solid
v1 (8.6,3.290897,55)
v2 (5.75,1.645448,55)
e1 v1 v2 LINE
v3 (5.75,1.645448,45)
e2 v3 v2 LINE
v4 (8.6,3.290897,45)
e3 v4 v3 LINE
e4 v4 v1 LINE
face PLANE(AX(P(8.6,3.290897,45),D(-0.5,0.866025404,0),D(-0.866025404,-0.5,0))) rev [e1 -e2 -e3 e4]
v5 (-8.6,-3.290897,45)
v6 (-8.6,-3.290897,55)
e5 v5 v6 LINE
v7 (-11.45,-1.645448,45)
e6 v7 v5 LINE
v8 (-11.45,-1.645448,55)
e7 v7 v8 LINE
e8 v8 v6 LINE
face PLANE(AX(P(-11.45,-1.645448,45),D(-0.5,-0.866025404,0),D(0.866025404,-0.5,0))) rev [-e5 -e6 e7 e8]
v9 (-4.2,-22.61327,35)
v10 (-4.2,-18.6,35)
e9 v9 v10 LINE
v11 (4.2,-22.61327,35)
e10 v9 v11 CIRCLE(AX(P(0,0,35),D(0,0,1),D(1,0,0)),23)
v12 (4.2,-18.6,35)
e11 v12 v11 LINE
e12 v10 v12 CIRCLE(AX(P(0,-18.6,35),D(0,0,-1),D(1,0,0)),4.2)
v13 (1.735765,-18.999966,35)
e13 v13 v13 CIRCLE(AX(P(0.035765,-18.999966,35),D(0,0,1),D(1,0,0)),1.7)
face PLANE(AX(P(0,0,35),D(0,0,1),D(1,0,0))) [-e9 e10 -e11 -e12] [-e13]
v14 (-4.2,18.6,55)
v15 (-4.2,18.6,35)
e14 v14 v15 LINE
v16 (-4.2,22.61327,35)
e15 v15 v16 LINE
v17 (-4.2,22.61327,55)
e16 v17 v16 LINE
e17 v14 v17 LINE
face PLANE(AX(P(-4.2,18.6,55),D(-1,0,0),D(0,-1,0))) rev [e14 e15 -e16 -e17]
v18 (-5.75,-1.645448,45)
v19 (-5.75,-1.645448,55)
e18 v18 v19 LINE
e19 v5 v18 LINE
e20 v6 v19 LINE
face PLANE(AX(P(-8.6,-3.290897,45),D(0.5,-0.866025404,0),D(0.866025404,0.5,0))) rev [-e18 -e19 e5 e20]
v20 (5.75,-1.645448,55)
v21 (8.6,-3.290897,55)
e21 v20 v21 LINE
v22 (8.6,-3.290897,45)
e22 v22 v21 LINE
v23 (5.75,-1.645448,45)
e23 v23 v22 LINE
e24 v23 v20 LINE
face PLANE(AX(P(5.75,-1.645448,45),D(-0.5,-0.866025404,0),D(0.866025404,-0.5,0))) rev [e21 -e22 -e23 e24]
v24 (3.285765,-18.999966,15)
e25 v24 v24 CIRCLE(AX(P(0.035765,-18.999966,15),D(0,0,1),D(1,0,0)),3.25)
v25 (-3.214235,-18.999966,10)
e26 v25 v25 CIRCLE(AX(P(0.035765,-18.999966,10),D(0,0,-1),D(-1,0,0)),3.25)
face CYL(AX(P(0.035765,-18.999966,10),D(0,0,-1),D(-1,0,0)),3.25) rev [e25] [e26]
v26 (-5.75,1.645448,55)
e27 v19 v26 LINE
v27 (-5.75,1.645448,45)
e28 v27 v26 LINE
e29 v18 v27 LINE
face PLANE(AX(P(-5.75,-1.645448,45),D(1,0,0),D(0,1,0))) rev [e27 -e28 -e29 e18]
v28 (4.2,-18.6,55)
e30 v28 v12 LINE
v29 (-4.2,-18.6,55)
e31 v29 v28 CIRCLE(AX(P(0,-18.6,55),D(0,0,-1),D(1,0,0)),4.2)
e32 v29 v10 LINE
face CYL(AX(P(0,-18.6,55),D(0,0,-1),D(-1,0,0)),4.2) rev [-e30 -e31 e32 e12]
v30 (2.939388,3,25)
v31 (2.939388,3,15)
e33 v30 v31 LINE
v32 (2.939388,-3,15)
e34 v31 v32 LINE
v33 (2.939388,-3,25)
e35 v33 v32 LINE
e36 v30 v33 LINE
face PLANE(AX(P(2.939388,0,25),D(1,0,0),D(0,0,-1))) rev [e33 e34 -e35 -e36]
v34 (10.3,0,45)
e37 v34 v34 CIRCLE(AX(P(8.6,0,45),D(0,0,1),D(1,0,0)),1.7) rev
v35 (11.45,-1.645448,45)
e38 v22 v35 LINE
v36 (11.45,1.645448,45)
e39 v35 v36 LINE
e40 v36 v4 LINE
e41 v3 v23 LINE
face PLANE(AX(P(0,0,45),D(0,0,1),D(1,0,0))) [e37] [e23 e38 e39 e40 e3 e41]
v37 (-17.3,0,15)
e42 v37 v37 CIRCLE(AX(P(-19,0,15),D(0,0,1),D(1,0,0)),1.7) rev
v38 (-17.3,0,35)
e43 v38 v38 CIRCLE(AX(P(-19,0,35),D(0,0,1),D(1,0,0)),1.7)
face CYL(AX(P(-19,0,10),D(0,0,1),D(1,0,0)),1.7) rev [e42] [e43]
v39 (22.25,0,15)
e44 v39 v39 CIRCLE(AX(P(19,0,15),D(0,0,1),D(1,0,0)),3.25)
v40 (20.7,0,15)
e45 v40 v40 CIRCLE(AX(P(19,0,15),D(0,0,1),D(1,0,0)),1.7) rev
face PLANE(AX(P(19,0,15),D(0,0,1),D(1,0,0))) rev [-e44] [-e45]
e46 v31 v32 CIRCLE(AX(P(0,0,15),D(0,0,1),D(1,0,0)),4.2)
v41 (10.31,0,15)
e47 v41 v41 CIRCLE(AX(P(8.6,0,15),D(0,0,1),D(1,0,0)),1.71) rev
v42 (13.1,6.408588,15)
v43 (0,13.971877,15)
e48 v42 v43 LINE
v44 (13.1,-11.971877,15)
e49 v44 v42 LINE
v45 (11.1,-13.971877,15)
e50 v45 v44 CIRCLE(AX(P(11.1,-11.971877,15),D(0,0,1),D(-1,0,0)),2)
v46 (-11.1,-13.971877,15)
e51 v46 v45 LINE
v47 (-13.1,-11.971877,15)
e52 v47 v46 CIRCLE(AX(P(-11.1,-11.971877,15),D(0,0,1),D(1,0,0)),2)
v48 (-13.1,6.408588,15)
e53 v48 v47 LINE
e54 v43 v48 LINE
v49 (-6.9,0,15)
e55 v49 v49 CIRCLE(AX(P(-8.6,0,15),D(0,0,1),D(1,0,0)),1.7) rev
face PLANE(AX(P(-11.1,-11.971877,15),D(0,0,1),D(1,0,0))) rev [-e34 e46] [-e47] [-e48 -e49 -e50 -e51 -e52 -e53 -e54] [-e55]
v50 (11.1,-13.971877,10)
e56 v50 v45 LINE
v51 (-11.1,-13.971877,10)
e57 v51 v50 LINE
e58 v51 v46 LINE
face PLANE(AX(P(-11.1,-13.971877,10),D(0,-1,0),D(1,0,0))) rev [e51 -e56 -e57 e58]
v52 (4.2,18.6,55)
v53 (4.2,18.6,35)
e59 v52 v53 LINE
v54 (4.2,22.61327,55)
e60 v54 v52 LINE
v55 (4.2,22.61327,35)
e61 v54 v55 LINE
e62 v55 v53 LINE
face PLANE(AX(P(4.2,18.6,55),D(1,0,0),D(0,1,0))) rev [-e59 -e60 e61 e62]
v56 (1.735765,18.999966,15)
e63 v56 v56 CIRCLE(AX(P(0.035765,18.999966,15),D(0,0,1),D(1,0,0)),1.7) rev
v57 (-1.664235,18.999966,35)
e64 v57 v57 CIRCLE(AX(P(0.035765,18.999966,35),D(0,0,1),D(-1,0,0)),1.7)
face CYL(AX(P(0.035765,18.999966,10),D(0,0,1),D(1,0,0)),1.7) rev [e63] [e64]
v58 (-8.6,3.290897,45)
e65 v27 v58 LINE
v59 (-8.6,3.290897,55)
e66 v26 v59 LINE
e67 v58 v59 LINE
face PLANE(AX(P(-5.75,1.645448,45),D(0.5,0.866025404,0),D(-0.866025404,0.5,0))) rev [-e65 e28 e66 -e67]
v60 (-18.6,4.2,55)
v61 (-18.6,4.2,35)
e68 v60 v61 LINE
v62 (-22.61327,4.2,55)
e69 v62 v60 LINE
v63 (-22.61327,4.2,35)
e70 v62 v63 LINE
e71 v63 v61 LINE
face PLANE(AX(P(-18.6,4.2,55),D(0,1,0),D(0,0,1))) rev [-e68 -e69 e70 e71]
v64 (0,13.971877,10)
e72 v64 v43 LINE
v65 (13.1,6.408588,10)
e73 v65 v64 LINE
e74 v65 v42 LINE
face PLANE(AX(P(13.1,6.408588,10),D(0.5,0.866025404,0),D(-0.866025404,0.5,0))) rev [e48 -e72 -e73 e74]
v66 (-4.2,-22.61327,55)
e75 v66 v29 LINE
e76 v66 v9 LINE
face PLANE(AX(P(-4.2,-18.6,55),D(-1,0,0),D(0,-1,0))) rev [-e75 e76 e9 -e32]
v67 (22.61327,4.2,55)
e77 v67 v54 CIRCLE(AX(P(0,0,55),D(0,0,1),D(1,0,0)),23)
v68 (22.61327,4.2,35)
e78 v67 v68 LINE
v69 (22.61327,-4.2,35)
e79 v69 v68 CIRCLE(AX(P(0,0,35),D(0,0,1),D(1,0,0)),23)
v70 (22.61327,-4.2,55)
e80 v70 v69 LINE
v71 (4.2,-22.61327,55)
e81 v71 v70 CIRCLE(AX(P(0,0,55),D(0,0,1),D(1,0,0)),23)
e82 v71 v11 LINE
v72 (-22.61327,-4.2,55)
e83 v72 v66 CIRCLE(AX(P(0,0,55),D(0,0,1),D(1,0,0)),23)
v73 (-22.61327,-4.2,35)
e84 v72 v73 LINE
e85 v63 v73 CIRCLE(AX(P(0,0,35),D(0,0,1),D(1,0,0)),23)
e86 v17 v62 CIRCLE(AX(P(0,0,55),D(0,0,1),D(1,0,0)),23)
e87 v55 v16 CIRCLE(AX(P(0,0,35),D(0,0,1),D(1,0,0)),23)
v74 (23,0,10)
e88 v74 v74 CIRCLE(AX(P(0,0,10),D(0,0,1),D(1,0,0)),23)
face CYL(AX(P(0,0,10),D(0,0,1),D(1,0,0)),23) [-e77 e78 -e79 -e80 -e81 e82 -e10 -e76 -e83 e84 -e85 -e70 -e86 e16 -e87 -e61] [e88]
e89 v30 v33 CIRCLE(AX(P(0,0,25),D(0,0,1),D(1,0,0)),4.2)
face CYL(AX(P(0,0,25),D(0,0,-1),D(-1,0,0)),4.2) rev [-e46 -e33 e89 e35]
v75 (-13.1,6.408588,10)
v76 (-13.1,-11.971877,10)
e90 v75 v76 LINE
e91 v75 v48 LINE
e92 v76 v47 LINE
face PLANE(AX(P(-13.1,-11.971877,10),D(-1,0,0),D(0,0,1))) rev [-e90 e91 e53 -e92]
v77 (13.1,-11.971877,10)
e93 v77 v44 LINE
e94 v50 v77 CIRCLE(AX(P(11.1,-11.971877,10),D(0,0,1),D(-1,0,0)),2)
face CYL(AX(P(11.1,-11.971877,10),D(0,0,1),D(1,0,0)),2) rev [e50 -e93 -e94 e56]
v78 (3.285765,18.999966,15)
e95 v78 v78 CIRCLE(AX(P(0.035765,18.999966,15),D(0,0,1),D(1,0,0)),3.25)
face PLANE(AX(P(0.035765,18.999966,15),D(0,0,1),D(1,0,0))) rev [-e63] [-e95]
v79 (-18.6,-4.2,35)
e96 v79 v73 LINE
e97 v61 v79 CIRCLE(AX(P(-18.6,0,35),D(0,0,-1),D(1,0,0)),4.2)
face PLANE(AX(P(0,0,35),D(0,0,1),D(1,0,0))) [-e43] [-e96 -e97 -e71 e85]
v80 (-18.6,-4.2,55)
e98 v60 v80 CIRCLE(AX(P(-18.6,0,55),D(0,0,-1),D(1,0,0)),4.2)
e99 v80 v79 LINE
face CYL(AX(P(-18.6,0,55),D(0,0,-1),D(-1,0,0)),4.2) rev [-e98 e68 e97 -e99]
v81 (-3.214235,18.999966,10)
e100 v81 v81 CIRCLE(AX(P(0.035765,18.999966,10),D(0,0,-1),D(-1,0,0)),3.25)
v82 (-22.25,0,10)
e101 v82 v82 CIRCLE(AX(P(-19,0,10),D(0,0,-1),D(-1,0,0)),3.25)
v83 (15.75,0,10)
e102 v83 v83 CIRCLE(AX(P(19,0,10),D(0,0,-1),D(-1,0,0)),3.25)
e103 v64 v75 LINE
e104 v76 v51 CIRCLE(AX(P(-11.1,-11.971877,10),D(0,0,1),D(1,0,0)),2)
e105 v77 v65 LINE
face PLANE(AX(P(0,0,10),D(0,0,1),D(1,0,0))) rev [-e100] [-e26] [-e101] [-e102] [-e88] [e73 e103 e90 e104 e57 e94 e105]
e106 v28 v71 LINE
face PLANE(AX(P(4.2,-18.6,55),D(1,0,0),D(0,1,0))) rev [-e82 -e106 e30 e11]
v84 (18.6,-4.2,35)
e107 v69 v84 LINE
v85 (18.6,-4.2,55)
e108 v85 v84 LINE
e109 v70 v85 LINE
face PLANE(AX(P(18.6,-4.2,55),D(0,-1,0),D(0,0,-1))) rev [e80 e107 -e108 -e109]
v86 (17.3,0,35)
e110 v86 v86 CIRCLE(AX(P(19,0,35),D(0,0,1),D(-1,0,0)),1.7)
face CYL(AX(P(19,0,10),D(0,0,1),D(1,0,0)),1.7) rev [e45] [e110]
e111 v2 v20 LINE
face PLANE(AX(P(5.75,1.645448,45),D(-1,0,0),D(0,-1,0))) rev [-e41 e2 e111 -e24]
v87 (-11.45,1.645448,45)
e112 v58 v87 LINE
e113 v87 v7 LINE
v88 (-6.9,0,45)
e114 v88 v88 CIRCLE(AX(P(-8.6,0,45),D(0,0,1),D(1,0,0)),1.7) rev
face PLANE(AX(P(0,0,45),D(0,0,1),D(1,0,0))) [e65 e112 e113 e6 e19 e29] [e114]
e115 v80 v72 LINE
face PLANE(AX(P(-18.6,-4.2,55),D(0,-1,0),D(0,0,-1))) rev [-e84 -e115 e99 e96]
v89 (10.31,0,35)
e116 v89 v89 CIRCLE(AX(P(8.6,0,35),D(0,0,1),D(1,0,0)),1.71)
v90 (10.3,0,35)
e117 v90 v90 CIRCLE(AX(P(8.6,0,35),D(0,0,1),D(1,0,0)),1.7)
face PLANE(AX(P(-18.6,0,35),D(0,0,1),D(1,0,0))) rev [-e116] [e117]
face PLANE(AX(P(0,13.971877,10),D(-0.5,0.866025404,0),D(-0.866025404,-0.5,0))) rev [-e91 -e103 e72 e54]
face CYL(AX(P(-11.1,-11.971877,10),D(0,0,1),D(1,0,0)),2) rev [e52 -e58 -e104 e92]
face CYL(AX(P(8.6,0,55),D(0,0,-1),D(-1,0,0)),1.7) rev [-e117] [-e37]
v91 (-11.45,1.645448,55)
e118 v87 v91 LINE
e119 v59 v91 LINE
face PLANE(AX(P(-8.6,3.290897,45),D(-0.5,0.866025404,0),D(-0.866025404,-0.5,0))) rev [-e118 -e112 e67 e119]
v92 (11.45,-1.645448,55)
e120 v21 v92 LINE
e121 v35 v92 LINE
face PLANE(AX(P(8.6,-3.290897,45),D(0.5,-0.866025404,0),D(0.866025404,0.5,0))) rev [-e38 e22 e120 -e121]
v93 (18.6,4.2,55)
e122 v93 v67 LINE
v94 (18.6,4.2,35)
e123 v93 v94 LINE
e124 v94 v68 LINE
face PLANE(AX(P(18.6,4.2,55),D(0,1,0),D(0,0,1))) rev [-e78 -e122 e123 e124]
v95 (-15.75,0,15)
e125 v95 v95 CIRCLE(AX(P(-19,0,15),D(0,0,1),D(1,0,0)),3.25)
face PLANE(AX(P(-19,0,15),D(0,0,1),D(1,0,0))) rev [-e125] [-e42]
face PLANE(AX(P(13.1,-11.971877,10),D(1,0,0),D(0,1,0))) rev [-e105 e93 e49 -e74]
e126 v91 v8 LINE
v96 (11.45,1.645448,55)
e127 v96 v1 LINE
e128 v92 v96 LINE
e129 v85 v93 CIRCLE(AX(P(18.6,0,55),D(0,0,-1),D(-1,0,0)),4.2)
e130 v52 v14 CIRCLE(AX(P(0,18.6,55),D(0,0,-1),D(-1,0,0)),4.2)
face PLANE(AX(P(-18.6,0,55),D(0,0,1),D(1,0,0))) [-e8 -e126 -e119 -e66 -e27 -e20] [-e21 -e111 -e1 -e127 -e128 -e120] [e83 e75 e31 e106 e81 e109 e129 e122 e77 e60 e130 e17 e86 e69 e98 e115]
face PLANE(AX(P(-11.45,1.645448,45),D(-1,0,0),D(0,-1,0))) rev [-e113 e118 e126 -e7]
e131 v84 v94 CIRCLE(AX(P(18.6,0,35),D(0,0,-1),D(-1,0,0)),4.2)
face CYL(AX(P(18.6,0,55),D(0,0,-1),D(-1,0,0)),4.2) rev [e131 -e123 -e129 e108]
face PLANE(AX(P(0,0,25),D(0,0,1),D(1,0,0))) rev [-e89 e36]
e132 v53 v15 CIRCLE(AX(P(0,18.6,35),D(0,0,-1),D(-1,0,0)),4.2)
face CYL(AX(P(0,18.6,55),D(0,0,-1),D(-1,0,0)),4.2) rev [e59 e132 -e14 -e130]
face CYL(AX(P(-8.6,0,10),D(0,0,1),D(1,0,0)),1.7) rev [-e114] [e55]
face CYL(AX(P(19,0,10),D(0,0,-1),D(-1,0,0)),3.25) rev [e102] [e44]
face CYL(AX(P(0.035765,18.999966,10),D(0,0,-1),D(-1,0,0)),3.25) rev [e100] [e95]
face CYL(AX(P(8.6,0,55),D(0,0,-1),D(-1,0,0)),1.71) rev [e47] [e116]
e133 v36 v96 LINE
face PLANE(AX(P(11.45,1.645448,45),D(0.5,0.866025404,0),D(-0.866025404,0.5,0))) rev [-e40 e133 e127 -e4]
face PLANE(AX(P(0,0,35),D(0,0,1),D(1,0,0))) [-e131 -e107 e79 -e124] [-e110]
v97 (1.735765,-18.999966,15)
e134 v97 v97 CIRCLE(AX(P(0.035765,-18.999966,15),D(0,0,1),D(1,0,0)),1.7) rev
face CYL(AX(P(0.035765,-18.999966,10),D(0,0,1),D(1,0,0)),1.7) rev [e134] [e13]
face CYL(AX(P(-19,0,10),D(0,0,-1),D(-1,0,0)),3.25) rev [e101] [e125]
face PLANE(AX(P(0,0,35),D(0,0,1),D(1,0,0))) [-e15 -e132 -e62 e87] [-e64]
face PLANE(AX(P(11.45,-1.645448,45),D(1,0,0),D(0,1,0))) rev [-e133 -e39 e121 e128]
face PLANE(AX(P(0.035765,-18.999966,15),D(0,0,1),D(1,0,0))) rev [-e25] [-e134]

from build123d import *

# Parameters (mm, degrees)
BOSS_EXTRUDE1_OUTLINE_R    = 16
BOSS_EXTRUDE1_DEPTH        = 15
SKETCH2_W                  = 7.4
SKETCH2_H                  = 24.742483552
CUT_EXTRUDE1_DEPTH         = 16.8
SKETCH3_R                  = 1.71
CUT_EXTRUDE2_DEPTH         = 70
BOSS_EXTRUDE2_DEPTH        = 20
BOSS_EXTRUDE2_DEPTH_BACK   = 5
SKETCH10_R                 = 23
SKETCH10_R_2               = 1.7
CUT_EXTRUDE4_DEPTH         = 25
SKETCH3_11_R               = 1.71
CUT_EXTRUDE5_DEPTH         = 55
CUT_EXTRUDE6_DEPTH         = 2.3
CUT_EXTRUDE6_DEPTH_BACK    = 0.7
SKETCH14_R                 = 12.3
BOSS_EXTRUDE3_START        = 20
BOSS_EXTRUDE3_DEPTH        = 20
SKETCH19_R                 = 16.2
CUT_EXTRUDE7_DEPTH         = 2.2
CUT_EXTRUDE8_START         = 35
CUT_EXTRUDE8_OUTLINE_R     = 1.7
CUT_EXTRUDE8_DEPTH         = 20
CUT_EXTRUDE9_START         = 2
CUT_EXTRUDE9_OUTLINE_R     = 16
CUT_EXTRUDE9_OUTLINE_R_2   = 15.484452344
CUT_EXTRUDE9_DEPTH         = 8
CUT_EXTRUDE9_START_2       = 10
CUT_EXTRUDE9_2_OUTLINE_R   = 3.25
CUT_EXTRUDE9_2_OUTLINE_R_2 = 1.7
CUT_EXTRUDE9_2_DEPTH       = 3
CUT_EXTRUDE10_DEPTH        = 3.6
SKETCH36_R                 = 15.484452344
CUT_EXTRUDE11_DEPTH        = 8
CUT_EXTRUDE13_DEPTH        = 5
CUT_EXTRUDE14_DEPTH        = 10
SKETCH39_R                 = 3.25
CUT_EXTRUDE15_DEPTH        = 5


# Read off the part's stored shape, not the designer's step: Boss-Extrude1, Cut-Extrude8, Cut-Extrude9
with BuildPart() as part:
    # Boss-Extrude1 outline → Boss-Extrude1 (new body)
    with BuildSketch(Plane(origin=(0, 0, 0), x_dir=(0, 1, 0), z_dir=(0, 0, 1))):
        Circle(BOSS_EXTRUDE1_OUTLINE_R)
    extrude(amount=BOSS_EXTRUDE1_DEPTH)

    # Sketch2 → Cut-Extrude1 (cut)
    with BuildSketch(Plane.ZY.offset(16)):
        with Locations((10.1, 0)):
            Rectangle(SKETCH2_W, SKETCH2_H)
    extrude(amount=-CUT_EXTRUDE1_DEPTH, mode=Mode.SUBTRACT)

    # Sketch3 → Cut-Extrude2 (cut)
    with BuildSketch(Plane(origin=(0, 0, 0), x_dir=(0, 1, 0), z_dir=(0, 0, 1))):
        with Locations((0, 8.6)):
            Circle(SKETCH3_R)
    extrude(amount=CUT_EXTRUDE2_DEPTH, mode=Mode.SUBTRACT)

    # Sketch10 → Boss-Extrude2 (add, two sides: drawn at the far end of the back side and taken through both)
    with BuildSketch(Plane(origin=(0, 0, 15), x_dir=(0, 1, 0), z_dir=(0, 0, 1)).offset(-BOSS_EXTRUDE2_DEPTH_BACK)):
        with Locations(Location((0, 0, 0), (0, 0, 270))):
            Circle(SKETCH10_R)
        with Locations(Location((0, 8.6, 0), (0, 0, 270))):
            Circle(SKETCH10_R_2, mode=Mode.SUBTRACT)
        with Locations(Location((0, 19, 0), (0, 0, 270))):
            Circle(SKETCH10_R_2, mode=Mode.SUBTRACT)
        with Locations(Location((18.999966339, -0.035764812, 0), (0, 0, 90))):
            Circle(SKETCH10_R_2, mode=Mode.SUBTRACT)
        with Locations(Location((0, -19, 0), (0, 0, 90))):
            Circle(SKETCH10_R_2, mode=Mode.SUBTRACT)
        with Locations(Location((-18.999966339, -0.035764812, 0), (0, 0, 270))):
            Circle(SKETCH10_R_2, mode=Mode.SUBTRACT)
        with Locations(Location((0, -8.6, 0), (0, 0, 270))):
            Circle(SKETCH10_R_2, mode=Mode.SUBTRACT)
    extrude(amount=BOSS_EXTRUDE2_DEPTH + BOSS_EXTRUDE2_DEPTH_BACK)

    # Sketch3<6> → Cut-Extrude4 (cut)
    with BuildSketch(Plane(origin=(0, 0, 0), x_dir=(0, 1, 0), z_dir=(0, 0, 1))):
        with BuildLine():
            Line((3, -2.939387691), (-3, -2.939387691))
            ThreePointArc((-3, -2.939387691), (0, 4.2), (3, -2.939387691))
        make_face()
    extrude(amount=CUT_EXTRUDE4_DEPTH, mode=Mode.SUBTRACT)

    # Sketch3<11> → Cut-Extrude5 (cut)
    with BuildSketch(Plane(origin=(0, 0, 0), x_dir=(0, 1, 0), z_dir=(0, 0, 1))):
        with Locations(Location((0, -8.6, 0), (0, 0, 90))):
            Circle(SKETCH3_11_R)
    extrude(amount=CUT_EXTRUDE5_DEPTH, mode=Mode.SUBTRACT)

    # Sketch14 → Cut-Extrude6 (cut, two sides: drawn at the far end of the back side and taken through both)
    with BuildSketch(Plane(origin=(0, 0, 7.5), x_dir=(0, 1, 0), z_dir=(0, 0, 1)).offset(-CUT_EXTRUDE6_DEPTH_BACK)):
        Circle(SKETCH14_R)
    extrude(amount=CUT_EXTRUDE6_DEPTH + CUT_EXTRUDE6_DEPTH_BACK, mode=Mode.SUBTRACT)

    # Sketch15 → Boss-Extrude3 (add)
    with BuildSketch(Plane(origin=(0, 0, 35), x_dir=(0, 1, 0), z_dir=(0, 0, 1)).offset(BOSS_EXTRUDE3_START)):
        with BuildLine():
            Line((-4.2, 18.6), (-4.2, 22.61327044))
            ThreePointArc((-4.2, 22.61327044), (-16.263455967, 16.263455967), (-22.61327044, 4.2))
            Line((-22.61327044, 4.2), (-18.6, 4.2))
            ThreePointArc((-18.6, 4.2), (-14.4, 0), (-18.6, -4.2))
            Line((-18.6, -4.2), (-22.61327044, -4.2))
            ThreePointArc((-22.61327044, -4.2), (-16.263455967, -16.263455967), (-4.2, -22.61327044))
            Line((-4.2, -22.61327044), (-4.2, -18.6))
            ThreePointArc((-4.2, -18.6), (0, -14.4), (4.2, -18.6))
            Line((4.2, -18.6), (4.2, -22.61327044))
            ThreePointArc((4.2, -22.61327044), (16.263455967, -16.263455967), (22.61327044, -4.2))
            Line((22.61327044, -4.2), (18.6, -4.2))
            ThreePointArc((18.6, -4.2), (14.4, 0), (18.6, 4.2))
            Line((18.6, 4.2), (22.61327044, 4.2))
            ThreePointArc((22.61327044, 4.2), (16.263455967, 16.263455967), (4.2, 22.61327044))
            Line((4.2, 22.61327044), (4.2, 18.6))
            ThreePointArc((4.2, 18.6), (0, 14.4), (-4.2, 18.6))
        make_face()
    extrude(amount=-BOSS_EXTRUDE3_DEPTH)

    # Sketch19 → Cut-Extrude7 (cut)
    with BuildSketch(Plane.YX.offset(0.2)):
        Circle(SKETCH19_R)
    extrude(amount=-CUT_EXTRUDE7_DEPTH, mode=Mode.SUBTRACT)

    # Cut-Extrude8 outline → Cut-Extrude8 (cut)
    with BuildSketch(Plane.XY.offset(CUT_EXTRUDE8_START)):
        with Locations((-8.6, 0)):
            Circle(CUT_EXTRUDE8_OUTLINE_R)
        with Locations((8.6, 0)):
            Circle(CUT_EXTRUDE8_OUTLINE_R)
    extrude(amount=CUT_EXTRUDE8_DEPTH, mode=Mode.SUBTRACT)

    # Sketch24 → CBORE for M3 SHCS1 (revolve, cut)
    with BuildSketch(Plane(origin=(0.035764812, 18.999966339, 10), x_dir=(0, 1, 0), z_dir=(1, 0, 0))):
        Polygon((0, 0), (0, 45), (1.7, 45), (1.7, 3), (3.25, 3), (3.25, 0), align=None)
    revolve(axis=Axis((0.035764812, 18.999966339, 3.65), (0, 0, 1)), mode=Mode.SUBTRACT)

    # Cut-Extrude9 outline → Cut-Extrude9 (cut)
    with BuildSketch(Plane.XY.offset(CUT_EXTRUDE9_START)):
        Circle(CUT_EXTRUDE9_OUTLINE_R)
        Circle(CUT_EXTRUDE9_OUTLINE_R_2, mode=Mode.SUBTRACT)
    extrude(amount=CUT_EXTRUDE9_DEPTH, mode=Mode.SUBTRACT)

    # Cut-Extrude9 2 outline → Cut-Extrude9 2 (cut)
    # profile 1 of 3: a face of its own
    with BuildSketch(Plane.XY.offset(CUT_EXTRUDE9_START_2)):
        with Locations((-19, 0)):
            Circle(CUT_EXTRUDE9_2_OUTLINE_R)
        with Locations((-19, 0)):
            Circle(CUT_EXTRUDE9_2_OUTLINE_R_2, mode=Mode.SUBTRACT)
    # profile 2 of 3: a face of its own
    with BuildSketch(Plane.XY.offset(CUT_EXTRUDE9_START_2)):
        with Locations((19, 0)):
            Circle(CUT_EXTRUDE9_2_OUTLINE_R)
        with Locations((19, 0)):
            Circle(CUT_EXTRUDE9_2_OUTLINE_R_2, mode=Mode.SUBTRACT)
    # profile 3 of 3: a face of its own
    with BuildSketch(Plane.XY.offset(CUT_EXTRUDE9_START_2)):
        with Locations((0.035764812, -18.999966339)):
            Circle(CUT_EXTRUDE9_2_OUTLINE_R)
        with Locations((0.035764812, -18.999966339)):
            Circle(CUT_EXTRUDE9_2_OUTLINE_R_2, mode=Mode.SUBTRACT)
    extrude(amount=CUT_EXTRUDE9_2_DEPTH, mode=Mode.SUBTRACT)

    # Sketch31 → Cut-Extrude10 (cut)
    with BuildSketch(Plane(origin=(0, 0, 10), x_dir=(0, 1, 0), z_dir=(0, 0, 1))):
        with BuildLine():
            Line((-12.4, 0), (12.4, 0))
            ThreePointArc((12.4, 0), (0, -12.4), (-12.4, 0))
        make_face()
    extrude(amount=-CUT_EXTRUDE10_DEPTH, mode=Mode.SUBTRACT)

    # Sketch36 → Cut-Extrude11 (cut)
    with BuildSketch(Plane(origin=(0, 0, 2), x_dir=(0, 1, 0), z_dir=(0, 0, 1))):
        Circle(SKETCH36_R)
    extrude(amount=CUT_EXTRUDE11_DEPTH, mode=Mode.SUBTRACT)

    # Sketch37 → Cut-Extrude13 (cut)
    with BuildSketch(Plane(origin=(0, 0, 15), x_dir=(0, 1, 0), z_dir=(0, 0, 1))):
        with BuildLine():
            Line((6.408587988, -13.1), (13.971876514, 0))
            Line((13.971876514, 0), (6.408587988, 13.1))
            Line((6.408587988, 13.1), (-11.971876514, 13.1))
            ThreePointArc((-11.971876514, 13.1), (-13.386090077, 12.514213562), (-13.971876514, 11.1))
            Line((-13.971876514, 11.1), (-13.971876514, -11.1))
            ThreePointArc((-13.971876514, -11.1), (-13.386090077, -12.514213562), (-11.971876514, -13.1))
            Line((-11.971876514, -13.1), (6.408587988, -13.1))
        make_face()
    extrude(amount=-CUT_EXTRUDE13_DEPTH, mode=Mode.SUBTRACT)

    # Sketch38 → Cut-Extrude14 (cut)
    with BuildSketch(Plane(origin=(0, 0, 55), x_dir=(0, 1, 0), z_dir=(0, 0, 1))):
        Polygon((3.290896534, 8.6), (1.645448267, 11.45), (-1.645448267, 11.45), (-3.290896534, 8.6), (-1.645448267, 5.75), (1.645448267, 5.75), align=None)
        Polygon((3.290896534, -8.6), (1.645448267, -5.75), (-1.645448267, -5.75), (-3.290896534, -8.6), (-1.645448267, -11.45), (1.645448267, -11.45), align=None)
    extrude(amount=-CUT_EXTRUDE14_DEPTH, mode=Mode.SUBTRACT)

    # Sketch39 → Cut-Extrude15 (cut)
    with BuildSketch(Plane(origin=(0, 0, 10), x_dir=(0, 1, 0), z_dir=(0, 0, 1))):
        with Locations(Location((0, 19, 0), (0, 0, 90))):
            Circle(SKETCH39_R)
        with Locations(Location((-18.999966339, -0.035764812, 0), (0, 0, 90))):
            Circle(SKETCH39_R)
        with Locations(Location((0, -19, 0), (0, 0, 90))):
            Circle(SKETCH39_R)
        with Locations(Location((18.999966339, -0.035764812, 0), (0, 0, 90))):
            Circle(SKETCH39_R)
    extrude(amount=CUT_EXTRUDE15_DEPTH, mode=Mode.SUBTRACT)


solid = part.part
